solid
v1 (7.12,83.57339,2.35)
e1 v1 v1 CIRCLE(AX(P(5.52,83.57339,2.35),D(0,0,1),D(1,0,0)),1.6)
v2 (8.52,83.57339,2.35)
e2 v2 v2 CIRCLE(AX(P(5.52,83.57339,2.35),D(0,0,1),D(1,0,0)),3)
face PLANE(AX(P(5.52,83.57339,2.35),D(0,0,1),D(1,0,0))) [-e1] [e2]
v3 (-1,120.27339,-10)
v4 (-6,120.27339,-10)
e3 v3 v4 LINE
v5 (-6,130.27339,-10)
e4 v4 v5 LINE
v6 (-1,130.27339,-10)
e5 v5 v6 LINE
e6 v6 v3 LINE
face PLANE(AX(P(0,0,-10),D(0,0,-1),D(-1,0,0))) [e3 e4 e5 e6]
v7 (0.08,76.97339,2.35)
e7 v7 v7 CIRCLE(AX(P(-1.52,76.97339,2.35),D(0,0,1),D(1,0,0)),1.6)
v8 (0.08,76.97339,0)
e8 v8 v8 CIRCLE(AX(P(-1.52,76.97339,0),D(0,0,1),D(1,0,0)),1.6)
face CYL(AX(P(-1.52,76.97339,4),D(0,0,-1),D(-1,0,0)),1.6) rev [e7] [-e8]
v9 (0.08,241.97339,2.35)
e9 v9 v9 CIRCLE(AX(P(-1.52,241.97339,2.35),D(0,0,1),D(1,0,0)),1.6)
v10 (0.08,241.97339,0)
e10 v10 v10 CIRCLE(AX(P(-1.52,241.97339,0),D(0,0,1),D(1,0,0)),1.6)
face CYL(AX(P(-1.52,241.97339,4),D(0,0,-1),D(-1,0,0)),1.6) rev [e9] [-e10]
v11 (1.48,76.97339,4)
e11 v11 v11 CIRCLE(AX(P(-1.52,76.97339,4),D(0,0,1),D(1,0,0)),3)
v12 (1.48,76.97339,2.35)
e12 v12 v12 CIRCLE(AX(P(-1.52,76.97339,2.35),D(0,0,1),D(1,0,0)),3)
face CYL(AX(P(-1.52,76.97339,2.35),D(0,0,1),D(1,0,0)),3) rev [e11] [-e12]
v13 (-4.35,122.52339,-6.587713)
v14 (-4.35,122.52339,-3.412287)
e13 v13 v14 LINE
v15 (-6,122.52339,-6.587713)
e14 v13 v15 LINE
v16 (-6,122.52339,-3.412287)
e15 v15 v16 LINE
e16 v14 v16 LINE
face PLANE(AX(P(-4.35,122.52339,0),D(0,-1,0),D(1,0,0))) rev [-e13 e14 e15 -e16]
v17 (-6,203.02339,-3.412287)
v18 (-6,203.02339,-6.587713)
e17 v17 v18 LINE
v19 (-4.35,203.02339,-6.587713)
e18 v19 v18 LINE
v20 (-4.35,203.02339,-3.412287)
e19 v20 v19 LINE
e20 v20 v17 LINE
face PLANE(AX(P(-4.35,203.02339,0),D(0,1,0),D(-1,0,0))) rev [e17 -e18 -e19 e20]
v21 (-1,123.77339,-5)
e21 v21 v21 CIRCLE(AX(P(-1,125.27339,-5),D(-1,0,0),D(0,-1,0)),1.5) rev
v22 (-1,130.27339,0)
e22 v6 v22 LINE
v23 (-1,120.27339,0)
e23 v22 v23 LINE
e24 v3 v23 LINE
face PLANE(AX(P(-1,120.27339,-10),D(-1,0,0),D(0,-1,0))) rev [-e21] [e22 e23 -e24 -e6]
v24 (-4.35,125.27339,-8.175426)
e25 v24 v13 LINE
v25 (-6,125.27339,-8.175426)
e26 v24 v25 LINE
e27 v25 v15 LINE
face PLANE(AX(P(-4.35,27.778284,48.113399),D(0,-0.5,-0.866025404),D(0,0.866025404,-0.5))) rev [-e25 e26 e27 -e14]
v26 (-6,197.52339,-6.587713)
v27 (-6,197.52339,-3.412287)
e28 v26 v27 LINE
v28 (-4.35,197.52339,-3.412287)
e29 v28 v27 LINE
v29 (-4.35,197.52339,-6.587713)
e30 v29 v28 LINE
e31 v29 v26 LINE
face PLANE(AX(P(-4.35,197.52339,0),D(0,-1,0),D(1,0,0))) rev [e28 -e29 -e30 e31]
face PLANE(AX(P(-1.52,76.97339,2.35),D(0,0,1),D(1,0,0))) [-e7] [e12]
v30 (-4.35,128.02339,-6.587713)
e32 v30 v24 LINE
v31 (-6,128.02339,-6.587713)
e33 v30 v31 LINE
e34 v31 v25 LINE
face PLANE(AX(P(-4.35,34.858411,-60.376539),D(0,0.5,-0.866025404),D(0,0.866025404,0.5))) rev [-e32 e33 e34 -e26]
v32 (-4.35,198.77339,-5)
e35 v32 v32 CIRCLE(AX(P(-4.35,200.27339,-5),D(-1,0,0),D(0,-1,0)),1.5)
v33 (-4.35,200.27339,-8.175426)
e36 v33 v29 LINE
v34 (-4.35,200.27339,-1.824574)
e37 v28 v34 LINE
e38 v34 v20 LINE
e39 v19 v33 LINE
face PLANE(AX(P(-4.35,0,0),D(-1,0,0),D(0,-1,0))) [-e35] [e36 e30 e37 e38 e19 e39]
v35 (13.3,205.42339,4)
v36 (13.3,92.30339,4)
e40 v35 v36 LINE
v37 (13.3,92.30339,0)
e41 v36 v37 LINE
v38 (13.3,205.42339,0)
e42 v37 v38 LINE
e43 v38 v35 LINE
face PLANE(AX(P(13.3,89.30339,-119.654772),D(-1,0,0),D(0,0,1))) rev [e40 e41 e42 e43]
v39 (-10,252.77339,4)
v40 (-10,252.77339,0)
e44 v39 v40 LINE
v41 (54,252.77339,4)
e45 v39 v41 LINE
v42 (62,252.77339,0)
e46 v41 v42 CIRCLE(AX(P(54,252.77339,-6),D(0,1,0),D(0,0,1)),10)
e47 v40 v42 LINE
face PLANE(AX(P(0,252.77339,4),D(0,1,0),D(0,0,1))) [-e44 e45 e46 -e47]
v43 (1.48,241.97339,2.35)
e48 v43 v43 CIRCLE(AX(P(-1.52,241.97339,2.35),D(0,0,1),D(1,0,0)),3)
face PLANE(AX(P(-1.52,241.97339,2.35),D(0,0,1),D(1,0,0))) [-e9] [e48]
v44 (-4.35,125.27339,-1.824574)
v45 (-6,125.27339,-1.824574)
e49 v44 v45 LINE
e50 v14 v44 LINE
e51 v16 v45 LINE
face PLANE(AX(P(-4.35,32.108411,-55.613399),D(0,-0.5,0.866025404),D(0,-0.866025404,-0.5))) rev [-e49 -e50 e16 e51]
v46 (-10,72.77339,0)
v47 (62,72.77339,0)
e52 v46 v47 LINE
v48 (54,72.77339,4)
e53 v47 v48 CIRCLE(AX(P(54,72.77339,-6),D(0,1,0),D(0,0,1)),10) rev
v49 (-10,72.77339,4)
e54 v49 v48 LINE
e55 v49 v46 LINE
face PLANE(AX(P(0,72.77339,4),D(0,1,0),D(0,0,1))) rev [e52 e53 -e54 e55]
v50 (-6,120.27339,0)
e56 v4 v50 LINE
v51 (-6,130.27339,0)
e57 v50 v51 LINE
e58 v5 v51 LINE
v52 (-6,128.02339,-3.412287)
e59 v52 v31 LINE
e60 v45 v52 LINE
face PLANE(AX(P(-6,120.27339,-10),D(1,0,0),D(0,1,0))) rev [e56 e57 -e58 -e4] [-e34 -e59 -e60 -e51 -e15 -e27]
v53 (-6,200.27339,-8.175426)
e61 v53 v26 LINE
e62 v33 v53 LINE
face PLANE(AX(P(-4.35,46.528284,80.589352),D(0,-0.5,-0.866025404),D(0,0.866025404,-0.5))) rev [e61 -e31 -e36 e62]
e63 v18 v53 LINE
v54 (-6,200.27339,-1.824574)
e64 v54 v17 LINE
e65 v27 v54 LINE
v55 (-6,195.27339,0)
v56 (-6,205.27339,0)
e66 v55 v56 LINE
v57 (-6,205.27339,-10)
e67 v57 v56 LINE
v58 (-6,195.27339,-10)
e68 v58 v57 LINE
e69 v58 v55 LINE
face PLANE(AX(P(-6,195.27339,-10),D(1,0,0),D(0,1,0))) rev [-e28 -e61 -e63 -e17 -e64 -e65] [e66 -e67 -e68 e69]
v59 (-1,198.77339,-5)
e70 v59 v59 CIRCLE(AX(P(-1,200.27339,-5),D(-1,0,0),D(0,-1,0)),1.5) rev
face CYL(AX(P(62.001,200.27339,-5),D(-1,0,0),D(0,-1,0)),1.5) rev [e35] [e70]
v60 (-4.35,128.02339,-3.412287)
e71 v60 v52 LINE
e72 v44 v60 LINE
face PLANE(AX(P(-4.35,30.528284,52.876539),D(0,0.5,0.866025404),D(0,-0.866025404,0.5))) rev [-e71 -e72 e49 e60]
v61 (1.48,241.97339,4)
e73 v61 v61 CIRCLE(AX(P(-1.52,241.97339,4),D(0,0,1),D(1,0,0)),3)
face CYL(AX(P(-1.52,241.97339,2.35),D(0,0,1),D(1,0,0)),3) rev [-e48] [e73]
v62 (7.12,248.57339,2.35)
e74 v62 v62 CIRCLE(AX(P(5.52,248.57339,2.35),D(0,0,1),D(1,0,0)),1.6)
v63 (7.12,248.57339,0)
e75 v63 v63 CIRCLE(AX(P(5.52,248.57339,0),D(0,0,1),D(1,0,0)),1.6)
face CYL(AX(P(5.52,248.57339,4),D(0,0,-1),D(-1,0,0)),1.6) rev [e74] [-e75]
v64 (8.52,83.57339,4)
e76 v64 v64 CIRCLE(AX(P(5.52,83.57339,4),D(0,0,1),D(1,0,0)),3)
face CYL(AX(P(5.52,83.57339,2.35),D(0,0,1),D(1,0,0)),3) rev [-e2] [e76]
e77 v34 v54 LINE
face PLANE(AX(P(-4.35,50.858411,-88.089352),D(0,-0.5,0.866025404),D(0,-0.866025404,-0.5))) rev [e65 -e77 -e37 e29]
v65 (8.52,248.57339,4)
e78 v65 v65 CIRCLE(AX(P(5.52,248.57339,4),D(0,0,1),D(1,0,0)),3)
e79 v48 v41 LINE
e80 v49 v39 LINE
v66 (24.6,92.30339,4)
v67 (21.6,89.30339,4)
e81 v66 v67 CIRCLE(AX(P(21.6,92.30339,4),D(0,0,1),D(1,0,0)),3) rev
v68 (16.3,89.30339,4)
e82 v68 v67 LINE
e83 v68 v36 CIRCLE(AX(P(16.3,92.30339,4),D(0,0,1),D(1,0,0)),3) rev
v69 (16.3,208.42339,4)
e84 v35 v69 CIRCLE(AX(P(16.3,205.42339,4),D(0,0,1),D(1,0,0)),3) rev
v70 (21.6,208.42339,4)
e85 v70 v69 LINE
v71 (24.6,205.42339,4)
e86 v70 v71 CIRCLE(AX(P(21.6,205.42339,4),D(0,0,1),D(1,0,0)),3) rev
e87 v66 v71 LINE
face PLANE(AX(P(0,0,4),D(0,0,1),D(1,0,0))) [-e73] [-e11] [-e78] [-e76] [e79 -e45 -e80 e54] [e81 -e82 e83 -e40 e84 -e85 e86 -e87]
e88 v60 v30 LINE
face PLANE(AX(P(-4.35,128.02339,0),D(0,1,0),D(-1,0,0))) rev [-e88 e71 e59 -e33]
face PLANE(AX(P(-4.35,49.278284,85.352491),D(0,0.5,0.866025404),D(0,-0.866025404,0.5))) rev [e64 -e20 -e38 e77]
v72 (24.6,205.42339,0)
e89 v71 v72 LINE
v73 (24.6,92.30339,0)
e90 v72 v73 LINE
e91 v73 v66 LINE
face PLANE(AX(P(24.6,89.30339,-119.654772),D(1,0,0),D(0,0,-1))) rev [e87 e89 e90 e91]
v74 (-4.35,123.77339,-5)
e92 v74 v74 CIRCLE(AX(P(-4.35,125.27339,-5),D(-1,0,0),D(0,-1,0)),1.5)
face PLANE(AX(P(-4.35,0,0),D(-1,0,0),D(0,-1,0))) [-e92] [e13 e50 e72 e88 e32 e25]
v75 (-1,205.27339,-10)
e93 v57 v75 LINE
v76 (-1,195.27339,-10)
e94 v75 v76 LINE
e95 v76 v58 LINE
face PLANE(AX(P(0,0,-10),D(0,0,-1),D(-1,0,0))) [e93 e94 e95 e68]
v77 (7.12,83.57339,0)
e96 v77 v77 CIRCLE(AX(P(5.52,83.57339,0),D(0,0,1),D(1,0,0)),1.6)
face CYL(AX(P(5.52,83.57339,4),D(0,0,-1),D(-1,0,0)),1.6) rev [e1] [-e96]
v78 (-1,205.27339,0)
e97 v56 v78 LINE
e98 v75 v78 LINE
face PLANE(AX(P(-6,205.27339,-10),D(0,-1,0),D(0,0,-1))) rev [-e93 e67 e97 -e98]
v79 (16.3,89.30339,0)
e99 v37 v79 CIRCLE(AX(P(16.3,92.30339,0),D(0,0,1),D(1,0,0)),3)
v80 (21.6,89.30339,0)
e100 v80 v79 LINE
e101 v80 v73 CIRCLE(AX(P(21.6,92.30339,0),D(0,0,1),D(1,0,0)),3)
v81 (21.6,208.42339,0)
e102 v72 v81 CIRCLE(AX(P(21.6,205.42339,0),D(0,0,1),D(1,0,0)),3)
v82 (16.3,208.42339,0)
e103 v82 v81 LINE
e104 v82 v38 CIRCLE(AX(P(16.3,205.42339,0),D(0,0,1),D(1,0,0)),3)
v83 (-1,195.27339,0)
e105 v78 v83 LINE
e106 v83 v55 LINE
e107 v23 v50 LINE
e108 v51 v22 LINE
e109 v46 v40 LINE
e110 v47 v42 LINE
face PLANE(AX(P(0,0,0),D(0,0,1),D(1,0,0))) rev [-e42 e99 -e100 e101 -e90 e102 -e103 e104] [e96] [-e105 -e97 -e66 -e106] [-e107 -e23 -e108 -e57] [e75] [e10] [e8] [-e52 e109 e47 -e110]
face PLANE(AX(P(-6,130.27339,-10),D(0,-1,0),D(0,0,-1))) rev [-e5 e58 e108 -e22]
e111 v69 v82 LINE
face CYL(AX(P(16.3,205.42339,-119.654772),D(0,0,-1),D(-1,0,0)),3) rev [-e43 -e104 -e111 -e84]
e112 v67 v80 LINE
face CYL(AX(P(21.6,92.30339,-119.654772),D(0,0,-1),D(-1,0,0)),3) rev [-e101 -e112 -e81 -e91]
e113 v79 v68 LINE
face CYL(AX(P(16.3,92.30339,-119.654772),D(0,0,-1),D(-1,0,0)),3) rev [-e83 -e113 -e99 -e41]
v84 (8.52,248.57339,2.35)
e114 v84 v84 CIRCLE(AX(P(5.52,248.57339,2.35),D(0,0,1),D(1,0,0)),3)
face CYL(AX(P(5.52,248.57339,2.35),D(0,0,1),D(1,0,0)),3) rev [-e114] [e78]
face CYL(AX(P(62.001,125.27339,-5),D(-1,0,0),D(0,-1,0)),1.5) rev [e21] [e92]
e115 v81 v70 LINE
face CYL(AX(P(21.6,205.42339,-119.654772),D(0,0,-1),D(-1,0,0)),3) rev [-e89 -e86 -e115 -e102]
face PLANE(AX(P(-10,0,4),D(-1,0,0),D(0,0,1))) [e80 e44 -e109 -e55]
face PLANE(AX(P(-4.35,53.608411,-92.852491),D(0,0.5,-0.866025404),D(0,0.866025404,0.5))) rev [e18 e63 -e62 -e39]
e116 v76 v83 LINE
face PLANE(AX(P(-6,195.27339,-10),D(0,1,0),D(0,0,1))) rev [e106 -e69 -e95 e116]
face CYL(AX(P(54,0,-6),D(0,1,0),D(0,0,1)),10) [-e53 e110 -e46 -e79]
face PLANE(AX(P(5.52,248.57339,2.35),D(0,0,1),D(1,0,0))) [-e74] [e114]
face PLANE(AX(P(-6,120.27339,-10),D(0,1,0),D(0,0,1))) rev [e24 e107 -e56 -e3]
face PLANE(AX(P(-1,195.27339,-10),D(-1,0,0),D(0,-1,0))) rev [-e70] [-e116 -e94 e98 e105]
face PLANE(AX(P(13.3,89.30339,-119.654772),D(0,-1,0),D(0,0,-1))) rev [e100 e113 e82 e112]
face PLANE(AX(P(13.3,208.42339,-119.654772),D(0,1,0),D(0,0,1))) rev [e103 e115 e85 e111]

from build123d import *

# Parameters (mm, degrees)
CROQUIS1_W              = 72
CROQUIS1_H              = 180
CROQUIS1_R              = 1.6
SALIENTE_EXTRUIR1_DEPTH = 4
CROQUIS2_R              = 3
CORTAR_EXTRUIR1_DEPTH   = 1.65
CROQUIS3_W              = 5
CROQUIS3_H              = 10
SALIENTE_EXTRUIR2_DEPTH = 10
CORTAR_EXTRUIR2_REACH   = 263.951
CROQUIS4_R              = 1.5
CROQUIS4_3_R            = 1.5
CORTAR_EXTRUIR3_DEPTH   = 1.65
REDONDEO2_R             = 10
CORTAR_EXTRUIR4_REACH   = 262.458
CROQUIS6_W              = 11.3
CROQUIS6_H              = 119.12
CORTAR_EXTRUIR5_DEPTH   = 4
REDONDEO3_R             = 3


with BuildPart() as part:
    # Croquis1 → Saliente-Extruir1 (new body)
    with BuildSketch(Plane.XY):
        with Locations((26, 162.773389683)):
            Rectangle(CROQUIS1_W, CROQUIS1_H)
        with Locations((-1.52, 76.973389683)):
            Circle(CROQUIS1_R, mode=Mode.SUBTRACT)
        with Locations((5.52, 83.573389683)):
            Circle(CROQUIS1_R, mode=Mode.SUBTRACT)
        with Locations((-1.52, 241.973389683)):
            Circle(CROQUIS1_R, mode=Mode.SUBTRACT)
        with Locations((5.52, 248.573389683)):
            Circle(CROQUIS1_R, mode=Mode.SUBTRACT)
    extrude(amount=SALIENTE_EXTRUIR1_DEPTH)

    # Croquis2 → Cortar-Extruir1 (cut)
    with BuildSketch(Plane.XY.offset(4)):
        with Locations((-1.52, 76.973389683)):
            Circle(CROQUIS2_R)
        with Locations((5.52, 83.573389683)):
            Circle(CROQUIS2_R)
        with Locations((-1.52, 241.973389683)):
            Circle(CROQUIS2_R)
        with Locations((5.52, 248.573389683)):
            Circle(CROQUIS2_R)
    extrude(amount=-CORTAR_EXTRUIR1_DEPTH, mode=Mode.SUBTRACT)

    # Croquis3 → Saliente-Extruir2 (add)
    with BuildSketch(Plane(origin=(0, 0, 0), x_dir=(-1, 0, 0), z_dir=(0, 0, -1))):
        with Locations((3.5, 125.273389683)):
            Rectangle(CROQUIS3_W, CROQUIS3_H)
        with Locations((3.5, 200.273389683)):
            Rectangle(CROQUIS3_W, CROQUIS3_H)
    extrude(amount=SALIENTE_EXTRUIR2_DEPTH)

    # Croquis4 → Cortar-Extruir2 (cut, up to next)
    with BuildSketch(Plane.ZY.offset(6), mode=Mode.PRIVATE) as cortar_extruir2_sk1:
        with Locations(Location((-5, 125.273389683, 0), (0, 0, 270))):
            Circle(CROQUIS4_R)
    cortar_extruir2_tool1 = extrude(cortar_extruir2_sk1.sketch, amount=-CORTAR_EXTRUIR2_REACH, mode=Mode.PRIVATE) & part.part
    # Croquis4 → Cortar-Extruir2 (cut, up to next)
    with BuildSketch(Plane.ZY.offset(6), mode=Mode.PRIVATE) as cortar_extruir2_sk2:
        with Locations(Location((-5, 200.273389683, 0), (0, 0, 270))):
            Circle(CROQUIS4_R)
    cortar_extruir2_tool2 = extrude(cortar_extruir2_sk2.sketch, amount=-CORTAR_EXTRUIR2_REACH, mode=Mode.PRIVATE) & part.part
    add(cortar_extruir2_tool1.solids().sort_by_distance((-6, 125.27339, -5))[0], mode=Mode.SUBTRACT)
    add(cortar_extruir2_tool2.solids().sort_by_distance((-6, 200.27339, -5))[0], mode=Mode.SUBTRACT)

    # Croquis4<3> → Cortar-Extruir3 (cut)
    # profile 1 of 2: a face of its own
    with BuildSketch(Plane.ZY.offset(6)):
        Polygon((-8.175426481, 200.273389683), (-6.58771324, 197.523389683), (-3.41228676, 197.523389683), (-1.824573519, 200.273389683), (-3.41228676, 203.023389683), (-6.58771324, 203.023389683), align=None)
        with Locations(Location((-5, 200.273389683, 0), (0, 0, 270))):
            Circle(CROQUIS4_3_R, mode=Mode.SUBTRACT)
    # profile 2 of 2: a face of its own
    with BuildSketch(Plane.ZY.offset(6)):
        Polygon((-8.175426481, 125.273389683), (-6.58771324, 122.523389683), (-3.41228676, 122.523389683), (-1.824573519, 125.273389683), (-3.41228676, 128.023389683), (-6.58771324, 128.023389683), align=None)
        with Locations(Location((-5, 125.273389683, 0), (0, 0, 270))):
            Circle(CROQUIS4_3_R, mode=Mode.SUBTRACT)
    extrude(amount=-CORTAR_EXTRUIR3_DEPTH, mode=Mode.SUBTRACT)

    # Redondeo2
    # the kernel refuses this fillet: 10 mm, written as the material it takes off along each edge
    with BuildSketch(Plane(origin=(62, 52.773389683, 4), x_dir=(0, 0, -1), z_dir=(0, 1, 0))) as redondeo2_piece_1:
        with BuildLine():
            CenterArc((10, 8), REDONDEO2_R, 180, 53.130102354)
            Line((0, 8), (-0.2, 8))
            Line((-0.2, 8), (-0.2, 0))
            Line((-0.2, 0), (0, -0.2))
            ThreePointArc((0, -0.2), (2, -0.2), (3.88, -0.16))
            Line((3.88, -0.16), (4, 0))
        make_face()
    extrude(amount=220, mode=Mode.SUBTRACT)

    # Croquis5 → Cortar-Extruir4 (cut, up to next)
    with BuildSketch(Plane(origin=(0, 0, 0), x_dir=(-1, 0, 0), z_dir=(0, 0, -1)), mode=Mode.PRIVATE) as cortar_extruir4_sk1:
        with BuildLine():
            Line((-18.04, 177.143389683), (-18.04, 170.803389683))
            ThreePointArc((-18.04, 170.803389683), (-18.479339828, 169.742729511), (-19.54, 169.303389683))
            Line((-19.54, 169.303389683), (-20.1, 169.303389683))
            ThreePointArc((-20.1, 169.303389683), (-21.160660172, 169.742729511), (-21.6, 170.803389683))
            Line((-21.6, 170.803389683), (-21.6, 177.143389683))
            ThreePointArc((-21.6, 177.143389683), (-21.160660172, 178.204049855), (-20.1, 178.643389683))
            Line((-20.1, 178.643389683), (-19.54, 178.643389683))
            ThreePointArc((-19.54, 178.643389683), (-18.479339828, 178.204049855), (-18.04, 177.143389683))
        make_face()
    cortar_extruir4_tool1 = extrude(cortar_extruir4_sk1.sketch, amount=-CORTAR_EXTRUIR4_REACH, mode=Mode.PRIVATE) & part.part
    # Croquis5 → Cortar-Extruir4 (cut, up to next)
    with BuildSketch(Plane(origin=(0, 0, 0), x_dir=(-1, 0, 0), z_dir=(0, 0, -1)), mode=Mode.PRIVATE) as cortar_extruir4_sk2:
        with BuildLine():
            Line((-18.3, 191.373389683), (-18.3, 185.773389683))
            ThreePointArc((-18.3, 185.773389683), (-18.490380592, 185.313770275), (-18.95, 185.123389683))
            Line((-18.95, 185.123389683), (-20.27019783, 185.123389683))
            ThreePointArc((-20.27019783, 185.123389683), (-20.510915139, 185.169605635), (-20.717401742, 185.301681447))
            Line((-20.717401742, 185.301681447), (-21.397203913, 185.946169218))
            ThreePointArc((-21.397203913, 185.946169218), (-21.547152637, 186.161150502), (-21.6, 186.417877455))
            Line((-21.6, 186.417877455), (-21.6, 188.413389575))
            Line((-21.6, 188.413389575), (-21.6, 190.728901911))
            ThreePointArc((-21.6, 190.728901911), (-21.547152637, 190.985628864), (-21.397203913, 191.200610148))
            Line((-21.397203913, 191.200610148), (-20.717401742, 191.84509792))
            ThreePointArc((-20.717401742, 191.84509792), (-20.510915139, 191.977173731), (-20.27019783, 192.023389683))
            Line((-20.27019783, 192.023389683), (-18.95, 192.023389683))
            ThreePointArc((-18.95, 192.023389683), (-18.490380592, 191.833009091), (-18.3, 191.373389683))
        make_face()
    cortar_extruir4_tool2 = extrude(cortar_extruir4_sk2.sketch, amount=-CORTAR_EXTRUIR4_REACH, mode=Mode.PRIVATE) & part.part
    # Croquis5 → Cortar-Extruir4 (cut, up to next)
    with BuildSketch(Plane(origin=(0, 0, 0), x_dir=(-1, 0, 0), z_dir=(0, 0, -1)), mode=Mode.PRIVATE) as cortar_extruir4_sk3:
        with BuildLine():
            Line((-18.95, 198.523389683), (-20.27019783, 198.523389683))
            ThreePointArc((-20.27019783, 198.523389683), (-20.510915139, 198.569605635), (-20.717401742, 198.701681447))
            Line((-20.717401742, 198.701681447), (-21.397203913, 199.346169218))
            ThreePointArc((-21.397203913, 199.346169218), (-21.547152637, 199.561150502), (-21.6, 199.817877455))
            Line((-21.6, 199.817877455), (-21.6, 201.813389575))
            Line((-21.6, 201.813389575), (-21.6, 204.128901911))
            ThreePointArc((-21.6, 204.128901911), (-21.547152637, 204.385628864), (-21.397203913, 204.600610148))
            Line((-21.397203913, 204.600610148), (-20.717401742, 205.24509792))
            ThreePointArc((-20.717401742, 205.24509792), (-20.510915139, 205.377173731), (-20.27019783, 205.423389683))
            Line((-20.27019783, 205.423389683), (-18.95, 205.423389683))
            ThreePointArc((-18.95, 205.423389683), (-18.490380592, 205.233009091), (-18.3, 204.773389683))
            Line((-18.3, 204.773389683), (-18.3, 199.173389683))
            ThreePointArc((-18.3, 199.173389683), (-18.490380592, 198.713770275), (-18.95, 198.523389683))
        make_face()
    cortar_extruir4_tool3 = extrude(cortar_extruir4_sk3.sketch, amount=-CORTAR_EXTRUIR4_REACH, mode=Mode.PRIVATE) & part.part
    add(cortar_extruir4_tool1.solids().sort_by_distance((19.82, 173.97339, 0))[0], mode=Mode.SUBTRACT)
    add(cortar_extruir4_tool2.solids().sort_by_distance((19.895302, 188.57339, 0))[0], mode=Mode.SUBTRACT)
    add(cortar_extruir4_tool3.solids().sort_by_distance((19.895302, 201.97339, 0))[0], mode=Mode.SUBTRACT)

    # Croquis6 → Cortar-Extruir5 (cut)
    with BuildSketch(Plane.XY.offset(4)):
        with Locations((18.95, 148.863389683)):
            Rectangle(CROQUIS6_W, CROQUIS6_H)
    extrude(amount=-CORTAR_EXTRUIR5_DEPTH, mode=Mode.SUBTRACT)

    # Redondeo3
    redondeo3_edges = [part.edges().sort_by_distance(p)[0] for p in [
        (13.3, 89.303389683, 2),
        (13.3, 208.423389683, 2),
        (24.6, 208.423389683, 2),
        (24.6, 89.303389683, 2),
    ]]
    fillet(redondeo3_edges, radius=REDONDEO3_R)


solid = part.part
